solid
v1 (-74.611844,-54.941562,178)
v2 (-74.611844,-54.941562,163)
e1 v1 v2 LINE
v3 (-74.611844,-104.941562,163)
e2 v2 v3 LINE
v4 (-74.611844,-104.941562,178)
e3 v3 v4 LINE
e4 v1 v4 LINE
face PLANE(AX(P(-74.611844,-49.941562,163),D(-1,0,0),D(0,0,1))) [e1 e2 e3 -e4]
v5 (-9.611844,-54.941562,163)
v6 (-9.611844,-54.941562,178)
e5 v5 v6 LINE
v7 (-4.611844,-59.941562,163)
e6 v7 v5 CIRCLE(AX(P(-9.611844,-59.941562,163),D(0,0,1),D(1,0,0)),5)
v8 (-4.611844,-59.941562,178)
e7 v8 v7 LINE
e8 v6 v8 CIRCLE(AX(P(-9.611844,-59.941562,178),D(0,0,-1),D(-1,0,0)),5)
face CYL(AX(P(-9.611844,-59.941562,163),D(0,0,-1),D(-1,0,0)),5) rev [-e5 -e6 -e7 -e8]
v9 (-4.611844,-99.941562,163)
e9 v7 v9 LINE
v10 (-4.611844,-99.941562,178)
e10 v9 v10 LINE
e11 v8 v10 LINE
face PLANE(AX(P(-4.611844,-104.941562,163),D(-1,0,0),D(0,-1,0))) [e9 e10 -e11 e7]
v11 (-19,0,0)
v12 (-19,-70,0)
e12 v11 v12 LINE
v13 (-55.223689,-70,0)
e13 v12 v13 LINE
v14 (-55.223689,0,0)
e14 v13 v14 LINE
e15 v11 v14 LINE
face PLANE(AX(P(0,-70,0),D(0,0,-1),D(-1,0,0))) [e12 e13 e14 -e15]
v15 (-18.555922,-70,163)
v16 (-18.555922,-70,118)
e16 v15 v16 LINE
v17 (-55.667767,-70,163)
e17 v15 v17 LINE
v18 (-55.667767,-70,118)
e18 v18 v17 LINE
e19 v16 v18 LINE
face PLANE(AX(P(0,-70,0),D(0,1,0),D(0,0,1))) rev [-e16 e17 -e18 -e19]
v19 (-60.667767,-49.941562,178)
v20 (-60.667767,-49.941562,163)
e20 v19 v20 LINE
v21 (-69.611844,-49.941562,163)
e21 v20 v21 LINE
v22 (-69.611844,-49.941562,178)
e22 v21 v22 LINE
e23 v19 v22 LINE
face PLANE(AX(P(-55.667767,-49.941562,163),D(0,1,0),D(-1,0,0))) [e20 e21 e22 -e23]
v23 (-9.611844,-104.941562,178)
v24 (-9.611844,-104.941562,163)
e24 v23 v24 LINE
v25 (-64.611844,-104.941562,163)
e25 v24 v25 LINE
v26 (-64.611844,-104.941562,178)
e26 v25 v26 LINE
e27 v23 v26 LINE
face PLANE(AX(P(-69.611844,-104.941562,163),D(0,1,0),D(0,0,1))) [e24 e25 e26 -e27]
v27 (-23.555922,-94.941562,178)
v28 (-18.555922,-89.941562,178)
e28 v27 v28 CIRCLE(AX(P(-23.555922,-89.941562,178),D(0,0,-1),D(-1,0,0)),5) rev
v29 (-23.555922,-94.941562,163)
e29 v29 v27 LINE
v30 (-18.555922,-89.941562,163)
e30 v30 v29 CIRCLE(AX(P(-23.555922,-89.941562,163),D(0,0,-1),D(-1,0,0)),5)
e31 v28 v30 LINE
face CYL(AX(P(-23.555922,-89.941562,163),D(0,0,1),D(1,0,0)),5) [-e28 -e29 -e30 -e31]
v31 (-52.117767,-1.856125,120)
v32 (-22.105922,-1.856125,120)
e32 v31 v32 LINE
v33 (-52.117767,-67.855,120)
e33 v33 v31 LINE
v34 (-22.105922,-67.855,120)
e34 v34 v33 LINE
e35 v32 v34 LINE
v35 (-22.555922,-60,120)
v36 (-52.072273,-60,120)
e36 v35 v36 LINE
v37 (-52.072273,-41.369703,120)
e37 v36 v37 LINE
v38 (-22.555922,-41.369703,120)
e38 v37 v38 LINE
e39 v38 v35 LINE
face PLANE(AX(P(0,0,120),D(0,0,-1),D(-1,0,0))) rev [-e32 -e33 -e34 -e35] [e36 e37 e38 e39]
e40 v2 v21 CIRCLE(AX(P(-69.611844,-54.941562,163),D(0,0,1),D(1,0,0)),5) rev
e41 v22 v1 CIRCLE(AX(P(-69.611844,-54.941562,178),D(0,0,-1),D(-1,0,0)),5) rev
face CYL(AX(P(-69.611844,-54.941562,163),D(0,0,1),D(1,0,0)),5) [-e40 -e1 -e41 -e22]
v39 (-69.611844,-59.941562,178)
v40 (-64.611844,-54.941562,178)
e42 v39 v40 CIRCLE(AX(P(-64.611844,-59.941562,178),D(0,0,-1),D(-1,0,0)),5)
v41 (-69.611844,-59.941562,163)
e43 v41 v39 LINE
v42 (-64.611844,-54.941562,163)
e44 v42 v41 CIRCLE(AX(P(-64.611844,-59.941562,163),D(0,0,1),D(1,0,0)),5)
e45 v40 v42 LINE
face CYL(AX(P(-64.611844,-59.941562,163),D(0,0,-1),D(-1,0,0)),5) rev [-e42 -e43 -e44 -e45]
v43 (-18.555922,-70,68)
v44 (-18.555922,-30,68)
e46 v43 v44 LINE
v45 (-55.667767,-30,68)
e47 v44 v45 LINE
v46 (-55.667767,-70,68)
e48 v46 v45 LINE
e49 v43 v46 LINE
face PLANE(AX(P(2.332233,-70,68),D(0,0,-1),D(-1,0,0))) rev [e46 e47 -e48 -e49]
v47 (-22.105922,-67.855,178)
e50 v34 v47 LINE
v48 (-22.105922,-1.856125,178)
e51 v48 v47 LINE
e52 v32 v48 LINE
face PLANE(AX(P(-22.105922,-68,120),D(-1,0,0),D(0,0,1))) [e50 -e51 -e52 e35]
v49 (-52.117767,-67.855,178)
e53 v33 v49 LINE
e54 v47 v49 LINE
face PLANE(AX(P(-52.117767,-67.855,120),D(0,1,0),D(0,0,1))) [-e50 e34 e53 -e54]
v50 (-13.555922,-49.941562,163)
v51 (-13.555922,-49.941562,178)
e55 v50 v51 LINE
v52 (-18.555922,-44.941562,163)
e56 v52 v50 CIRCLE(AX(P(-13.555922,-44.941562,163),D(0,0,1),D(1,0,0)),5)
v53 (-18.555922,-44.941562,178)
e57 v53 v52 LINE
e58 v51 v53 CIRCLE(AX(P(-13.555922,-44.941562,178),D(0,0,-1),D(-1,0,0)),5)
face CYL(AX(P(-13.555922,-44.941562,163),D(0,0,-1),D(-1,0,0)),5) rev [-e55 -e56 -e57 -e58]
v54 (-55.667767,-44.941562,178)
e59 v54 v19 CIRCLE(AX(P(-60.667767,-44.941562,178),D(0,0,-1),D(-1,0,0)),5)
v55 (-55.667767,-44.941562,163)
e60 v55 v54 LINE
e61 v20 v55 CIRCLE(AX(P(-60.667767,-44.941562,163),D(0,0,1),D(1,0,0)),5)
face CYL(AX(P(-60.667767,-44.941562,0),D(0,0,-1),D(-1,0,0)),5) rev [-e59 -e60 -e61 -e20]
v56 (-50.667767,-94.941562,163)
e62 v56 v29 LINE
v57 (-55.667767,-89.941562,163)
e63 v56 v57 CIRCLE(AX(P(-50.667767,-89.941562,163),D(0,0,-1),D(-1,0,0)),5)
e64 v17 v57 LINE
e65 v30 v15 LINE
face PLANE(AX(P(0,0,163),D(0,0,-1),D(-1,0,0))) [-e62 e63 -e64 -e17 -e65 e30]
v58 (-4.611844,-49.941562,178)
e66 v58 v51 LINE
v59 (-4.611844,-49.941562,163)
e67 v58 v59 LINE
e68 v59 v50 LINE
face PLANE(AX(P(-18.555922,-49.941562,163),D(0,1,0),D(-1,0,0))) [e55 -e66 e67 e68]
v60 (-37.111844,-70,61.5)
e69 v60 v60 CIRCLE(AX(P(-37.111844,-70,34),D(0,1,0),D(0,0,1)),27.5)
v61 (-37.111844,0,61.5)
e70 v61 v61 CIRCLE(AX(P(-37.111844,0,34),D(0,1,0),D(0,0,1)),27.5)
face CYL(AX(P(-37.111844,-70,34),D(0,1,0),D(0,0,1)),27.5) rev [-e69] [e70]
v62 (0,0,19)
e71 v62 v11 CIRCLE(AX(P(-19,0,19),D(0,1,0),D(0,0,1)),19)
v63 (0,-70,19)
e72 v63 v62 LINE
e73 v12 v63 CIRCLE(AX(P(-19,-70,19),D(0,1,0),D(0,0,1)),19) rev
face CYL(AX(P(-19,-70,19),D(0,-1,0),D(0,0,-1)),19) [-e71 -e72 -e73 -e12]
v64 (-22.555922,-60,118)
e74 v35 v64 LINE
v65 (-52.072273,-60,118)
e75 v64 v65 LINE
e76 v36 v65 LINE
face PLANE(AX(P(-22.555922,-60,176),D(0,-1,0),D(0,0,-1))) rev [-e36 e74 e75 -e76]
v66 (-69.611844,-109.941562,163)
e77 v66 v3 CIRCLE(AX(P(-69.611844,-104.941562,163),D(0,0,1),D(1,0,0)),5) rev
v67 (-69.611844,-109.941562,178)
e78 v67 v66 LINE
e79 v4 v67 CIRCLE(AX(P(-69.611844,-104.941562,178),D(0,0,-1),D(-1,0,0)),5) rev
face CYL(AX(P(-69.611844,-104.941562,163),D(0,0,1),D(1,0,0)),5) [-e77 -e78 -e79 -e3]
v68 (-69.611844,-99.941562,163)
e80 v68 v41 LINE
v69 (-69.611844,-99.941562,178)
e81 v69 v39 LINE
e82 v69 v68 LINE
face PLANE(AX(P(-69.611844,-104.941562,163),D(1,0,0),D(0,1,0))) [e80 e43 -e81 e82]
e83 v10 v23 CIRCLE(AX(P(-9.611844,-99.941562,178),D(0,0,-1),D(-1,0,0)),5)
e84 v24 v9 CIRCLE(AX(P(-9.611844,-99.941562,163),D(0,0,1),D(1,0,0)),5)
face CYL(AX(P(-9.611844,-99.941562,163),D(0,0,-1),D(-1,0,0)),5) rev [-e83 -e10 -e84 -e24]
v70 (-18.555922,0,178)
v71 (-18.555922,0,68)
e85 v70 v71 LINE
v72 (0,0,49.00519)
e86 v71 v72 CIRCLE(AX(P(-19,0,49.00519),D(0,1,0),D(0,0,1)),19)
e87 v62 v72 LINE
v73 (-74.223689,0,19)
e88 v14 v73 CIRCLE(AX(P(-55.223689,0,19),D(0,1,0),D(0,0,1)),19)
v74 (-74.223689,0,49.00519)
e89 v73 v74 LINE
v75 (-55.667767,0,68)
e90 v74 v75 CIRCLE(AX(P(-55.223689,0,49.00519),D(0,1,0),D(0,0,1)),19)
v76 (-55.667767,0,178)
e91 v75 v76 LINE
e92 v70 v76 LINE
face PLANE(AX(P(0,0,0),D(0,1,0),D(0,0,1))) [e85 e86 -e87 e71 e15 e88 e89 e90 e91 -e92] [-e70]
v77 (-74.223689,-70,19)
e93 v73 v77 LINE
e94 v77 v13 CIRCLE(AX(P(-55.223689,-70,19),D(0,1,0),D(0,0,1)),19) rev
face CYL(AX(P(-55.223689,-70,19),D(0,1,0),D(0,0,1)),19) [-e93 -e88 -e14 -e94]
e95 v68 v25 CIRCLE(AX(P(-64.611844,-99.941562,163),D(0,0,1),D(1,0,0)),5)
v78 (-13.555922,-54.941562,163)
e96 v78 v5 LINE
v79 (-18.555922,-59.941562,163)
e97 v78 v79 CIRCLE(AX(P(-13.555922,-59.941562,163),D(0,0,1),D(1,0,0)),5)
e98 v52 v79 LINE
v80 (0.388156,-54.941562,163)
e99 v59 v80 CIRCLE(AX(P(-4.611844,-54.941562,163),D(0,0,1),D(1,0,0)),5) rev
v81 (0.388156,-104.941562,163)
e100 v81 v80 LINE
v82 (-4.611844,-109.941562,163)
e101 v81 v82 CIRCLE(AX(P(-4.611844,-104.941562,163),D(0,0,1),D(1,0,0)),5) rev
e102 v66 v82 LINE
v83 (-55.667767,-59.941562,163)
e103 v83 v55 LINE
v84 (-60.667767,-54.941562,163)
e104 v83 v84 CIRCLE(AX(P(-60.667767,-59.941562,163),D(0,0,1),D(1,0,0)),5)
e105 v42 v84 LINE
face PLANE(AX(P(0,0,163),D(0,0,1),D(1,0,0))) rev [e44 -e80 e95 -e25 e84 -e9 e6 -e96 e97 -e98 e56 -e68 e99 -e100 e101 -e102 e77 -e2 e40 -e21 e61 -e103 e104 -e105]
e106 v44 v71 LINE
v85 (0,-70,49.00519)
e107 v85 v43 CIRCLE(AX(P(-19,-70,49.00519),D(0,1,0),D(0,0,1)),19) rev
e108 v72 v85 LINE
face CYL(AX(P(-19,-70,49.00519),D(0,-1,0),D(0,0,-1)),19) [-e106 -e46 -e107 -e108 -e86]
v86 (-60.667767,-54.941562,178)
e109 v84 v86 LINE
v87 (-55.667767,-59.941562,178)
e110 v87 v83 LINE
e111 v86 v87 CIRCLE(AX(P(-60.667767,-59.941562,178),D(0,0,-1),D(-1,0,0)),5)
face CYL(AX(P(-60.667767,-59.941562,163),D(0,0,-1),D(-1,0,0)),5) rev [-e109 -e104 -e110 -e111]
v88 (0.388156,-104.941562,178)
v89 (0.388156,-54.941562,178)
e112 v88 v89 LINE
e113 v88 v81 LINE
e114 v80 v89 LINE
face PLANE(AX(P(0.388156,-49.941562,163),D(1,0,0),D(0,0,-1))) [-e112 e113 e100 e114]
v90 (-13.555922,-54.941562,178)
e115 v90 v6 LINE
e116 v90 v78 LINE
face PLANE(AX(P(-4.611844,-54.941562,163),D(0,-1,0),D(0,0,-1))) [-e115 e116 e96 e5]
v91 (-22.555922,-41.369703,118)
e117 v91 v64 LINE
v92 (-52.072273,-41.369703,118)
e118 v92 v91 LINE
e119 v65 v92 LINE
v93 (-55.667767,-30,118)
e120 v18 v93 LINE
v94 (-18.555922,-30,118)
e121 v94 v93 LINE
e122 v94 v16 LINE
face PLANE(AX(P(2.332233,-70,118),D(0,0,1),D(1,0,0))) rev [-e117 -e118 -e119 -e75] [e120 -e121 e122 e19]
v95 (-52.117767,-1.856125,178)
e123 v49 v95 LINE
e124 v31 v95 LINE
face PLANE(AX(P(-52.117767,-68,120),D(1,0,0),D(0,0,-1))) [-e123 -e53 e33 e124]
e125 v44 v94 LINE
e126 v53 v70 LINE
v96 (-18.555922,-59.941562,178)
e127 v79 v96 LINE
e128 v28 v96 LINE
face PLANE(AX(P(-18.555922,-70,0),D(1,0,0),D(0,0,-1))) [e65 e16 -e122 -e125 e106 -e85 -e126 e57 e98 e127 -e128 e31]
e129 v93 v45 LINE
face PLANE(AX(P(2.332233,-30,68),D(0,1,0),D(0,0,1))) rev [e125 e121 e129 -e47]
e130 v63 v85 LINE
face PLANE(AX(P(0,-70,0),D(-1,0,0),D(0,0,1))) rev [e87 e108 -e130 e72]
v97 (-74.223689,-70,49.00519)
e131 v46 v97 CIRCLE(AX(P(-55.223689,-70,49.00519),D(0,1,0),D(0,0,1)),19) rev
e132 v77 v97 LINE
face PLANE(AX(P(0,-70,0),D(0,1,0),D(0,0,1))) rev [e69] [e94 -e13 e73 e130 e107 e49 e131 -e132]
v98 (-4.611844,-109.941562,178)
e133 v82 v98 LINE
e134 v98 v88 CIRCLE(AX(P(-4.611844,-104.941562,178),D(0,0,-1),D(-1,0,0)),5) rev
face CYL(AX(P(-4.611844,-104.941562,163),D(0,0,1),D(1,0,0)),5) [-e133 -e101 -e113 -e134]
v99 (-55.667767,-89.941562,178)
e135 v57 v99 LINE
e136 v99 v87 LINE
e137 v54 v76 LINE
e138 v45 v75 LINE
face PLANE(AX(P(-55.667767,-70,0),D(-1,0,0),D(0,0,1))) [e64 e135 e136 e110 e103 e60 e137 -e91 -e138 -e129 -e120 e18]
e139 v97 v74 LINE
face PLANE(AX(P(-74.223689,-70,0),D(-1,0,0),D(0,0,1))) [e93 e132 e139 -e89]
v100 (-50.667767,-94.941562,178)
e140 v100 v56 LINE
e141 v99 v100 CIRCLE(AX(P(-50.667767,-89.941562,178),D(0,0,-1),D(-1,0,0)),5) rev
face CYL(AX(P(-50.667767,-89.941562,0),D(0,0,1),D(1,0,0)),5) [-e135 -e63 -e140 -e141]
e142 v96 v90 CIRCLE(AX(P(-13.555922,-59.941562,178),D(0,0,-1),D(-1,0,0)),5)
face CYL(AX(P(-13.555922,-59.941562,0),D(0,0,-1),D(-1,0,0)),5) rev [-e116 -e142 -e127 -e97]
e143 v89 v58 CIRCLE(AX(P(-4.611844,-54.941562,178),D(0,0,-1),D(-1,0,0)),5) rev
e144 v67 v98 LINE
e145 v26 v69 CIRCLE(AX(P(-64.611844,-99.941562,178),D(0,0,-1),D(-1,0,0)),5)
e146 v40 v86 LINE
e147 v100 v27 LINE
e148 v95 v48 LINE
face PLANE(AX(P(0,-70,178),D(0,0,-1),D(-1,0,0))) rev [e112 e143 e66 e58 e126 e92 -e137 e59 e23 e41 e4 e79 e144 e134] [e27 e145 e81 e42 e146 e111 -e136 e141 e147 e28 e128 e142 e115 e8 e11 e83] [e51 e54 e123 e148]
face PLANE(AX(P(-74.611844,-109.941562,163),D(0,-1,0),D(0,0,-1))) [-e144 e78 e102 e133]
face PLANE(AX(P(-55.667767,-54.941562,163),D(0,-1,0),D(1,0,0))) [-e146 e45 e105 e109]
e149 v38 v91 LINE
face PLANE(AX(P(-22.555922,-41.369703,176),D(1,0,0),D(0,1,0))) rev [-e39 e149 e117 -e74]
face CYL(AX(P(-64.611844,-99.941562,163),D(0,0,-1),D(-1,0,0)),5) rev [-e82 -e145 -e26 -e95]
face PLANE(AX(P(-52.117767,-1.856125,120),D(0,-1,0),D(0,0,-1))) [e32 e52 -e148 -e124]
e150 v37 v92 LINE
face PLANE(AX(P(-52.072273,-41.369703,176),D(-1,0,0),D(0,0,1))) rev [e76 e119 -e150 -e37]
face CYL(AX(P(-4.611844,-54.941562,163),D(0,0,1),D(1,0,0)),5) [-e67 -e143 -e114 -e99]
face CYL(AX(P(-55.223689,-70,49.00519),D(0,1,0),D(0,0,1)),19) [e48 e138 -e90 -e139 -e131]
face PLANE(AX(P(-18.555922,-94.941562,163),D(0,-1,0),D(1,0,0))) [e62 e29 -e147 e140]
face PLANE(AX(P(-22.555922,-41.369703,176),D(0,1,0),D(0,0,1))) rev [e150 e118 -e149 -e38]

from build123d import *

# Parameters (mm, degrees)
SKETCH1_W           = 74.22368895
SKETCH1_H           = 68
SKETCH1_W_2         = 37.111844475
SKETCH1_H_2         = 52
SKETCH1_H_3         = 58
BOSS_EXTRUDE1_DEPTH = 70
SKETCH2_R           = 27.5
CUT_EXTRUDE1_DEPTH  = 70
FILLET1_R           = 19
SKETCH3_W           = 33.111844475
SKETCH3_H           = 64.288874977
CUT_EXTRUDE2_DEPTH  = 58
SKETCH5_W           = 50
SKETCH5_H           = 40
CUT_EXTRUDE3_DEPTH  = 58
SKETCH7_W           = 29.516350972
SKETCH7_H           = 18.630296647
CUT_EXTRUDE5_DEPTH  = 58
SKETCH8_W           = 33.111844475
SKETCH8_H           = 2
CUT_EXTRUDE6_DEPTH  = 58
SKETCH9_W           = 1.55
SKETCH9_H           = 66.288874977
BOSS_EXTRUDE2_DEPTH = 58
SKETCH10_W          = 30.011844475
SKETCH10_H          = 0.145
BOSS_EXTRUDE3_DEPTH = 58
SKETCH11_W          = 37.111844475
SKETCH11_H          = 24.941562027
BOSS_EXTRUDE5_DEPTH = 15
FILLET3_R           = 5
FILLET4_R           = 5
FILLET5_R           = 5


with BuildPart() as part:
    # Sketch1 → Boss-Extrude1 (new body)
    with BuildSketch(Plane(origin=(0, 0, 0), x_dir=(1, 0, 0), z_dir=(0, 1, 0))):
        with Locations((-37.111844475, -34)):
            Rectangle(SKETCH1_W, SKETCH1_H)
        with Locations((-37.111844475, -94)):
            Rectangle(SKETCH1_W_2, SKETCH1_H_2)
        with Locations((-37.111844475, -149)):
            Rectangle(SKETCH1_W_2, SKETCH1_H_3)
    extrude(amount=-BOSS_EXTRUDE1_DEPTH)

    # Sketch2 → Cut-Extrude1 (cut)
    with BuildSketch(Plane(origin=(0, 0, 0), x_dir=(1, 0, 0), z_dir=(0, 1, 0))):
        with Locations(Location((-37.111844475, -34, 0), (0, 0, 270))):
            Circle(SKETCH2_R)
    extrude(amount=-CUT_EXTRUDE1_DEPTH, mode=Mode.SUBTRACT)

    # Fillet1
    # the kernel refuses this fillet: 19 mm, written as the material it takes off along each edge
    with BuildSketch(Plane(origin=(0, 47.487024211, 68), x_dir=(0, 0, -1), z_dir=(0, -1, 0))) as fillet1_piece_1:
        with BuildLine():
            CenterArc((18.994809684, -19), FILLET1_R, 90, 88.660731648)
            Line((0, -18.555922237), (-0.379896194, -18.547040682))
            ThreePointArc((-0.379896194, -18.547040682), (-0.38, -9.277961119), (-0.38, 0))
            Line((-0.38, 0), (0, 0.38))
            Line((0, 0.38), (18.994809684, 0.38))
            Line((18.994809684, 0.38), (18.994809684, 0))
        make_face()
    extrude(amount=164.974048421, mode=Mode.SUBTRACT)
    with BuildSketch(Plane(origin=(0, 47.5, 0), x_dir=(-1, 0, 0), z_dir=(0, -1, 0))) as fillet1_piece_2:
        with BuildLine():
            CenterArc((FILLET1_R, -FILLET1_R), FILLET1_R, 90, 90)
            Line((0, -FILLET1_R), (-FILLET1_R * 0.02, -FILLET1_R))
            Line((-FILLET1_R * 0.02, -FILLET1_R), (-FILLET1_R * 0.02, FILLET1_R * 0.02))
            Line((-FILLET1_R * 0.02, FILLET1_R * 0.02), (FILLET1_R, FILLET1_R * 0.02))
            Line((FILLET1_R, FILLET1_R * 0.02), (FILLET1_R, 0))
        make_face()
    extrude(amount=165, mode=Mode.SUBTRACT)
    with BuildSketch(Plane(origin=(-74.22368895, 47.487024211, 68), x_dir=(0, 0, -1), z_dir=(0, -1, 0))) as fillet1_piece_3:
        with BuildLine():
            CenterArc((18.994809684, 19), FILLET1_R, 181.339268352, 88.660731648)
            Line((0, 18.555922237), (-0.379896194, 18.547040682))
            ThreePointArc((-0.379896194, 18.547040682), (-0.38, 9.277961119), (-0.38, 0))
            Line((-0.38, 0), (0, -0.38))
            Line((0, -0.38), (18.994809684, -0.38))
            Line((18.994809684, -0.38), (18.994809684, 0))
        make_face()
    extrude(amount=164.974048421, mode=Mode.SUBTRACT)
    with BuildSketch(Plane(origin=(-74.22368895, 47.5, 0), x_dir=(1, 0, 0), z_dir=(0, -1, 0))) as fillet1_piece_4:
        with BuildLine():
            CenterArc((FILLET1_R, FILLET1_R), FILLET1_R, 180, 90)
            Line((0, FILLET1_R), (-FILLET1_R * 0.02, FILLET1_R))
            Line((-FILLET1_R * 0.02, FILLET1_R), (-FILLET1_R * 0.02, -FILLET1_R * 0.02))
            Line((-FILLET1_R * 0.02, -FILLET1_R * 0.02), (FILLET1_R, -FILLET1_R * 0.02))
            Line((FILLET1_R, -FILLET1_R * 0.02), (FILLET1_R, 0))
        make_face()
    extrude(amount=165, mode=Mode.SUBTRACT)

    # Sketch3 → Cut-Extrude2 (cut)
    with BuildSketch(Plane.XY.offset(178)):
        with Locations((-37.111844475, -35.855562511)):
            Rectangle(SKETCH3_W, SKETCH3_H)
    extrude(amount=-CUT_EXTRUDE2_DEPTH, mode=Mode.SUBTRACT)

    # Sketch5 → Cut-Extrude3 (cut)
    with BuildSketch(Plane.ZY.offset(55.667766712)):
        with Locations((93, -50)):
            Rectangle(SKETCH5_W, SKETCH5_H)
    extrude(amount=-CUT_EXTRUDE3_DEPTH, mode=Mode.SUBTRACT)

    # Sketch7 → Cut-Extrude5 (cut)
    with BuildSketch(Plane(origin=(0, 0, 118), x_dir=(-1, 0, 0), z_dir=(0, 0, -1))):
        with Locations((37.314097723, -50.684851677)):
            Rectangle(SKETCH7_W, SKETCH7_H)
    extrude(amount=-CUT_EXTRUDE5_DEPTH, mode=Mode.SUBTRACT)

    # Sketch8 → Cut-Extrude6 (cut)
    with BuildSketch(Plane.XY.offset(178)):
        with Locations((-37.111844475, -2.711125023)):
            Rectangle(SKETCH8_W, SKETCH8_H)
    extrude(amount=-CUT_EXTRUDE6_DEPTH, mode=Mode.SUBTRACT)

    # Sketch9 → Boss-Extrude2 (add)
    with BuildSketch(Plane.XY.offset(178)):
        with Locations((-52.892766712, -34.855562511)):
            Rectangle(SKETCH9_W, SKETCH9_H)
        with Locations((-21.330922237, -34.855562511)):
            Rectangle(SKETCH9_W, SKETCH9_H)
    extrude(amount=-BOSS_EXTRUDE2_DEPTH)

    # Sketch10 → Boss-Extrude3 (add)
    with BuildSketch(Plane.XY.offset(178)):
        with Locations((-37.111844475, -67.9275)):
            Rectangle(SKETCH10_W, SKETCH10_H)
        with Locations((-37.111844475, -1.783625023)):
            Rectangle(SKETCH10_W, SKETCH10_H)
    extrude(amount=-BOSS_EXTRUDE3_DEPTH)

    # Sketch11 → Boss-Extrude5 (add)
    with BuildSketch(Plane.XY.offset(178)):
        Polygon((-74.611844475, -49.941562027), (-74.611844475, -109.941562027), (0.388155525, -109.941562027), (0.388155525, -49.941562027), (-18.555922237, -49.941562027), (-18.555922237, -54.941562027), (-4.611844475, -54.941562027), (-4.611844475, -104.941562027), (-69.611844475, -104.941562027), (-69.611844475, -54.941562027), (-55.667766712, -54.941562027), (-55.667766712, -49.941562027), align=None)
        with Locations((-37.111844475, -82.470781014)):
            Rectangle(SKETCH11_W, SKETCH11_H)
    extrude(amount=-BOSS_EXTRUDE5_DEPTH)

    # Fillet3
    fillet3_edges = [part.edges().sort_by_distance(p)[0] for p in [
        (-4.611844475, -104.941562027, 170.5),
        (-4.611844475, -54.941562027, 170.5),
        (0.388155525, -49.941562027, 170.5),
        (0.388155525, -109.941562027, 170.5),
        (-74.611844475, -109.941562027, 170.5),
        (-74.611844475, -49.941562027, 170.5),
        (-69.611844475, -54.941562027, 170.5),
        (-69.611844475, -104.941562027, 170.5),
        (-18.555922237, -94.941562027, 170.5),
        (-55.667766712, -94.941562027, 170.5),
    ]]
    fillet(fillet3_edges, radius=FILLET3_R)

    # Fillet4
    fillet4_edges = [part.edges().sort_by_distance(p)[0] for p in [
        (-18.555922237, -54.941562027, 170.5),
        (-55.667766712, -54.941562027, 170.5),
    ]]
    fillet(fillet4_edges, radius=FILLET4_R)

    # Fillet5
    fillet5_edges = [part.edges().sort_by_distance(p)[0] for p in [
        (-18.555922237, -49.941562027, 170.5),
        (-55.667766712, -49.941562027, 170.5),
    ]]
    fillet(fillet5_edges, radius=FILLET5_R)


solid = part.part
